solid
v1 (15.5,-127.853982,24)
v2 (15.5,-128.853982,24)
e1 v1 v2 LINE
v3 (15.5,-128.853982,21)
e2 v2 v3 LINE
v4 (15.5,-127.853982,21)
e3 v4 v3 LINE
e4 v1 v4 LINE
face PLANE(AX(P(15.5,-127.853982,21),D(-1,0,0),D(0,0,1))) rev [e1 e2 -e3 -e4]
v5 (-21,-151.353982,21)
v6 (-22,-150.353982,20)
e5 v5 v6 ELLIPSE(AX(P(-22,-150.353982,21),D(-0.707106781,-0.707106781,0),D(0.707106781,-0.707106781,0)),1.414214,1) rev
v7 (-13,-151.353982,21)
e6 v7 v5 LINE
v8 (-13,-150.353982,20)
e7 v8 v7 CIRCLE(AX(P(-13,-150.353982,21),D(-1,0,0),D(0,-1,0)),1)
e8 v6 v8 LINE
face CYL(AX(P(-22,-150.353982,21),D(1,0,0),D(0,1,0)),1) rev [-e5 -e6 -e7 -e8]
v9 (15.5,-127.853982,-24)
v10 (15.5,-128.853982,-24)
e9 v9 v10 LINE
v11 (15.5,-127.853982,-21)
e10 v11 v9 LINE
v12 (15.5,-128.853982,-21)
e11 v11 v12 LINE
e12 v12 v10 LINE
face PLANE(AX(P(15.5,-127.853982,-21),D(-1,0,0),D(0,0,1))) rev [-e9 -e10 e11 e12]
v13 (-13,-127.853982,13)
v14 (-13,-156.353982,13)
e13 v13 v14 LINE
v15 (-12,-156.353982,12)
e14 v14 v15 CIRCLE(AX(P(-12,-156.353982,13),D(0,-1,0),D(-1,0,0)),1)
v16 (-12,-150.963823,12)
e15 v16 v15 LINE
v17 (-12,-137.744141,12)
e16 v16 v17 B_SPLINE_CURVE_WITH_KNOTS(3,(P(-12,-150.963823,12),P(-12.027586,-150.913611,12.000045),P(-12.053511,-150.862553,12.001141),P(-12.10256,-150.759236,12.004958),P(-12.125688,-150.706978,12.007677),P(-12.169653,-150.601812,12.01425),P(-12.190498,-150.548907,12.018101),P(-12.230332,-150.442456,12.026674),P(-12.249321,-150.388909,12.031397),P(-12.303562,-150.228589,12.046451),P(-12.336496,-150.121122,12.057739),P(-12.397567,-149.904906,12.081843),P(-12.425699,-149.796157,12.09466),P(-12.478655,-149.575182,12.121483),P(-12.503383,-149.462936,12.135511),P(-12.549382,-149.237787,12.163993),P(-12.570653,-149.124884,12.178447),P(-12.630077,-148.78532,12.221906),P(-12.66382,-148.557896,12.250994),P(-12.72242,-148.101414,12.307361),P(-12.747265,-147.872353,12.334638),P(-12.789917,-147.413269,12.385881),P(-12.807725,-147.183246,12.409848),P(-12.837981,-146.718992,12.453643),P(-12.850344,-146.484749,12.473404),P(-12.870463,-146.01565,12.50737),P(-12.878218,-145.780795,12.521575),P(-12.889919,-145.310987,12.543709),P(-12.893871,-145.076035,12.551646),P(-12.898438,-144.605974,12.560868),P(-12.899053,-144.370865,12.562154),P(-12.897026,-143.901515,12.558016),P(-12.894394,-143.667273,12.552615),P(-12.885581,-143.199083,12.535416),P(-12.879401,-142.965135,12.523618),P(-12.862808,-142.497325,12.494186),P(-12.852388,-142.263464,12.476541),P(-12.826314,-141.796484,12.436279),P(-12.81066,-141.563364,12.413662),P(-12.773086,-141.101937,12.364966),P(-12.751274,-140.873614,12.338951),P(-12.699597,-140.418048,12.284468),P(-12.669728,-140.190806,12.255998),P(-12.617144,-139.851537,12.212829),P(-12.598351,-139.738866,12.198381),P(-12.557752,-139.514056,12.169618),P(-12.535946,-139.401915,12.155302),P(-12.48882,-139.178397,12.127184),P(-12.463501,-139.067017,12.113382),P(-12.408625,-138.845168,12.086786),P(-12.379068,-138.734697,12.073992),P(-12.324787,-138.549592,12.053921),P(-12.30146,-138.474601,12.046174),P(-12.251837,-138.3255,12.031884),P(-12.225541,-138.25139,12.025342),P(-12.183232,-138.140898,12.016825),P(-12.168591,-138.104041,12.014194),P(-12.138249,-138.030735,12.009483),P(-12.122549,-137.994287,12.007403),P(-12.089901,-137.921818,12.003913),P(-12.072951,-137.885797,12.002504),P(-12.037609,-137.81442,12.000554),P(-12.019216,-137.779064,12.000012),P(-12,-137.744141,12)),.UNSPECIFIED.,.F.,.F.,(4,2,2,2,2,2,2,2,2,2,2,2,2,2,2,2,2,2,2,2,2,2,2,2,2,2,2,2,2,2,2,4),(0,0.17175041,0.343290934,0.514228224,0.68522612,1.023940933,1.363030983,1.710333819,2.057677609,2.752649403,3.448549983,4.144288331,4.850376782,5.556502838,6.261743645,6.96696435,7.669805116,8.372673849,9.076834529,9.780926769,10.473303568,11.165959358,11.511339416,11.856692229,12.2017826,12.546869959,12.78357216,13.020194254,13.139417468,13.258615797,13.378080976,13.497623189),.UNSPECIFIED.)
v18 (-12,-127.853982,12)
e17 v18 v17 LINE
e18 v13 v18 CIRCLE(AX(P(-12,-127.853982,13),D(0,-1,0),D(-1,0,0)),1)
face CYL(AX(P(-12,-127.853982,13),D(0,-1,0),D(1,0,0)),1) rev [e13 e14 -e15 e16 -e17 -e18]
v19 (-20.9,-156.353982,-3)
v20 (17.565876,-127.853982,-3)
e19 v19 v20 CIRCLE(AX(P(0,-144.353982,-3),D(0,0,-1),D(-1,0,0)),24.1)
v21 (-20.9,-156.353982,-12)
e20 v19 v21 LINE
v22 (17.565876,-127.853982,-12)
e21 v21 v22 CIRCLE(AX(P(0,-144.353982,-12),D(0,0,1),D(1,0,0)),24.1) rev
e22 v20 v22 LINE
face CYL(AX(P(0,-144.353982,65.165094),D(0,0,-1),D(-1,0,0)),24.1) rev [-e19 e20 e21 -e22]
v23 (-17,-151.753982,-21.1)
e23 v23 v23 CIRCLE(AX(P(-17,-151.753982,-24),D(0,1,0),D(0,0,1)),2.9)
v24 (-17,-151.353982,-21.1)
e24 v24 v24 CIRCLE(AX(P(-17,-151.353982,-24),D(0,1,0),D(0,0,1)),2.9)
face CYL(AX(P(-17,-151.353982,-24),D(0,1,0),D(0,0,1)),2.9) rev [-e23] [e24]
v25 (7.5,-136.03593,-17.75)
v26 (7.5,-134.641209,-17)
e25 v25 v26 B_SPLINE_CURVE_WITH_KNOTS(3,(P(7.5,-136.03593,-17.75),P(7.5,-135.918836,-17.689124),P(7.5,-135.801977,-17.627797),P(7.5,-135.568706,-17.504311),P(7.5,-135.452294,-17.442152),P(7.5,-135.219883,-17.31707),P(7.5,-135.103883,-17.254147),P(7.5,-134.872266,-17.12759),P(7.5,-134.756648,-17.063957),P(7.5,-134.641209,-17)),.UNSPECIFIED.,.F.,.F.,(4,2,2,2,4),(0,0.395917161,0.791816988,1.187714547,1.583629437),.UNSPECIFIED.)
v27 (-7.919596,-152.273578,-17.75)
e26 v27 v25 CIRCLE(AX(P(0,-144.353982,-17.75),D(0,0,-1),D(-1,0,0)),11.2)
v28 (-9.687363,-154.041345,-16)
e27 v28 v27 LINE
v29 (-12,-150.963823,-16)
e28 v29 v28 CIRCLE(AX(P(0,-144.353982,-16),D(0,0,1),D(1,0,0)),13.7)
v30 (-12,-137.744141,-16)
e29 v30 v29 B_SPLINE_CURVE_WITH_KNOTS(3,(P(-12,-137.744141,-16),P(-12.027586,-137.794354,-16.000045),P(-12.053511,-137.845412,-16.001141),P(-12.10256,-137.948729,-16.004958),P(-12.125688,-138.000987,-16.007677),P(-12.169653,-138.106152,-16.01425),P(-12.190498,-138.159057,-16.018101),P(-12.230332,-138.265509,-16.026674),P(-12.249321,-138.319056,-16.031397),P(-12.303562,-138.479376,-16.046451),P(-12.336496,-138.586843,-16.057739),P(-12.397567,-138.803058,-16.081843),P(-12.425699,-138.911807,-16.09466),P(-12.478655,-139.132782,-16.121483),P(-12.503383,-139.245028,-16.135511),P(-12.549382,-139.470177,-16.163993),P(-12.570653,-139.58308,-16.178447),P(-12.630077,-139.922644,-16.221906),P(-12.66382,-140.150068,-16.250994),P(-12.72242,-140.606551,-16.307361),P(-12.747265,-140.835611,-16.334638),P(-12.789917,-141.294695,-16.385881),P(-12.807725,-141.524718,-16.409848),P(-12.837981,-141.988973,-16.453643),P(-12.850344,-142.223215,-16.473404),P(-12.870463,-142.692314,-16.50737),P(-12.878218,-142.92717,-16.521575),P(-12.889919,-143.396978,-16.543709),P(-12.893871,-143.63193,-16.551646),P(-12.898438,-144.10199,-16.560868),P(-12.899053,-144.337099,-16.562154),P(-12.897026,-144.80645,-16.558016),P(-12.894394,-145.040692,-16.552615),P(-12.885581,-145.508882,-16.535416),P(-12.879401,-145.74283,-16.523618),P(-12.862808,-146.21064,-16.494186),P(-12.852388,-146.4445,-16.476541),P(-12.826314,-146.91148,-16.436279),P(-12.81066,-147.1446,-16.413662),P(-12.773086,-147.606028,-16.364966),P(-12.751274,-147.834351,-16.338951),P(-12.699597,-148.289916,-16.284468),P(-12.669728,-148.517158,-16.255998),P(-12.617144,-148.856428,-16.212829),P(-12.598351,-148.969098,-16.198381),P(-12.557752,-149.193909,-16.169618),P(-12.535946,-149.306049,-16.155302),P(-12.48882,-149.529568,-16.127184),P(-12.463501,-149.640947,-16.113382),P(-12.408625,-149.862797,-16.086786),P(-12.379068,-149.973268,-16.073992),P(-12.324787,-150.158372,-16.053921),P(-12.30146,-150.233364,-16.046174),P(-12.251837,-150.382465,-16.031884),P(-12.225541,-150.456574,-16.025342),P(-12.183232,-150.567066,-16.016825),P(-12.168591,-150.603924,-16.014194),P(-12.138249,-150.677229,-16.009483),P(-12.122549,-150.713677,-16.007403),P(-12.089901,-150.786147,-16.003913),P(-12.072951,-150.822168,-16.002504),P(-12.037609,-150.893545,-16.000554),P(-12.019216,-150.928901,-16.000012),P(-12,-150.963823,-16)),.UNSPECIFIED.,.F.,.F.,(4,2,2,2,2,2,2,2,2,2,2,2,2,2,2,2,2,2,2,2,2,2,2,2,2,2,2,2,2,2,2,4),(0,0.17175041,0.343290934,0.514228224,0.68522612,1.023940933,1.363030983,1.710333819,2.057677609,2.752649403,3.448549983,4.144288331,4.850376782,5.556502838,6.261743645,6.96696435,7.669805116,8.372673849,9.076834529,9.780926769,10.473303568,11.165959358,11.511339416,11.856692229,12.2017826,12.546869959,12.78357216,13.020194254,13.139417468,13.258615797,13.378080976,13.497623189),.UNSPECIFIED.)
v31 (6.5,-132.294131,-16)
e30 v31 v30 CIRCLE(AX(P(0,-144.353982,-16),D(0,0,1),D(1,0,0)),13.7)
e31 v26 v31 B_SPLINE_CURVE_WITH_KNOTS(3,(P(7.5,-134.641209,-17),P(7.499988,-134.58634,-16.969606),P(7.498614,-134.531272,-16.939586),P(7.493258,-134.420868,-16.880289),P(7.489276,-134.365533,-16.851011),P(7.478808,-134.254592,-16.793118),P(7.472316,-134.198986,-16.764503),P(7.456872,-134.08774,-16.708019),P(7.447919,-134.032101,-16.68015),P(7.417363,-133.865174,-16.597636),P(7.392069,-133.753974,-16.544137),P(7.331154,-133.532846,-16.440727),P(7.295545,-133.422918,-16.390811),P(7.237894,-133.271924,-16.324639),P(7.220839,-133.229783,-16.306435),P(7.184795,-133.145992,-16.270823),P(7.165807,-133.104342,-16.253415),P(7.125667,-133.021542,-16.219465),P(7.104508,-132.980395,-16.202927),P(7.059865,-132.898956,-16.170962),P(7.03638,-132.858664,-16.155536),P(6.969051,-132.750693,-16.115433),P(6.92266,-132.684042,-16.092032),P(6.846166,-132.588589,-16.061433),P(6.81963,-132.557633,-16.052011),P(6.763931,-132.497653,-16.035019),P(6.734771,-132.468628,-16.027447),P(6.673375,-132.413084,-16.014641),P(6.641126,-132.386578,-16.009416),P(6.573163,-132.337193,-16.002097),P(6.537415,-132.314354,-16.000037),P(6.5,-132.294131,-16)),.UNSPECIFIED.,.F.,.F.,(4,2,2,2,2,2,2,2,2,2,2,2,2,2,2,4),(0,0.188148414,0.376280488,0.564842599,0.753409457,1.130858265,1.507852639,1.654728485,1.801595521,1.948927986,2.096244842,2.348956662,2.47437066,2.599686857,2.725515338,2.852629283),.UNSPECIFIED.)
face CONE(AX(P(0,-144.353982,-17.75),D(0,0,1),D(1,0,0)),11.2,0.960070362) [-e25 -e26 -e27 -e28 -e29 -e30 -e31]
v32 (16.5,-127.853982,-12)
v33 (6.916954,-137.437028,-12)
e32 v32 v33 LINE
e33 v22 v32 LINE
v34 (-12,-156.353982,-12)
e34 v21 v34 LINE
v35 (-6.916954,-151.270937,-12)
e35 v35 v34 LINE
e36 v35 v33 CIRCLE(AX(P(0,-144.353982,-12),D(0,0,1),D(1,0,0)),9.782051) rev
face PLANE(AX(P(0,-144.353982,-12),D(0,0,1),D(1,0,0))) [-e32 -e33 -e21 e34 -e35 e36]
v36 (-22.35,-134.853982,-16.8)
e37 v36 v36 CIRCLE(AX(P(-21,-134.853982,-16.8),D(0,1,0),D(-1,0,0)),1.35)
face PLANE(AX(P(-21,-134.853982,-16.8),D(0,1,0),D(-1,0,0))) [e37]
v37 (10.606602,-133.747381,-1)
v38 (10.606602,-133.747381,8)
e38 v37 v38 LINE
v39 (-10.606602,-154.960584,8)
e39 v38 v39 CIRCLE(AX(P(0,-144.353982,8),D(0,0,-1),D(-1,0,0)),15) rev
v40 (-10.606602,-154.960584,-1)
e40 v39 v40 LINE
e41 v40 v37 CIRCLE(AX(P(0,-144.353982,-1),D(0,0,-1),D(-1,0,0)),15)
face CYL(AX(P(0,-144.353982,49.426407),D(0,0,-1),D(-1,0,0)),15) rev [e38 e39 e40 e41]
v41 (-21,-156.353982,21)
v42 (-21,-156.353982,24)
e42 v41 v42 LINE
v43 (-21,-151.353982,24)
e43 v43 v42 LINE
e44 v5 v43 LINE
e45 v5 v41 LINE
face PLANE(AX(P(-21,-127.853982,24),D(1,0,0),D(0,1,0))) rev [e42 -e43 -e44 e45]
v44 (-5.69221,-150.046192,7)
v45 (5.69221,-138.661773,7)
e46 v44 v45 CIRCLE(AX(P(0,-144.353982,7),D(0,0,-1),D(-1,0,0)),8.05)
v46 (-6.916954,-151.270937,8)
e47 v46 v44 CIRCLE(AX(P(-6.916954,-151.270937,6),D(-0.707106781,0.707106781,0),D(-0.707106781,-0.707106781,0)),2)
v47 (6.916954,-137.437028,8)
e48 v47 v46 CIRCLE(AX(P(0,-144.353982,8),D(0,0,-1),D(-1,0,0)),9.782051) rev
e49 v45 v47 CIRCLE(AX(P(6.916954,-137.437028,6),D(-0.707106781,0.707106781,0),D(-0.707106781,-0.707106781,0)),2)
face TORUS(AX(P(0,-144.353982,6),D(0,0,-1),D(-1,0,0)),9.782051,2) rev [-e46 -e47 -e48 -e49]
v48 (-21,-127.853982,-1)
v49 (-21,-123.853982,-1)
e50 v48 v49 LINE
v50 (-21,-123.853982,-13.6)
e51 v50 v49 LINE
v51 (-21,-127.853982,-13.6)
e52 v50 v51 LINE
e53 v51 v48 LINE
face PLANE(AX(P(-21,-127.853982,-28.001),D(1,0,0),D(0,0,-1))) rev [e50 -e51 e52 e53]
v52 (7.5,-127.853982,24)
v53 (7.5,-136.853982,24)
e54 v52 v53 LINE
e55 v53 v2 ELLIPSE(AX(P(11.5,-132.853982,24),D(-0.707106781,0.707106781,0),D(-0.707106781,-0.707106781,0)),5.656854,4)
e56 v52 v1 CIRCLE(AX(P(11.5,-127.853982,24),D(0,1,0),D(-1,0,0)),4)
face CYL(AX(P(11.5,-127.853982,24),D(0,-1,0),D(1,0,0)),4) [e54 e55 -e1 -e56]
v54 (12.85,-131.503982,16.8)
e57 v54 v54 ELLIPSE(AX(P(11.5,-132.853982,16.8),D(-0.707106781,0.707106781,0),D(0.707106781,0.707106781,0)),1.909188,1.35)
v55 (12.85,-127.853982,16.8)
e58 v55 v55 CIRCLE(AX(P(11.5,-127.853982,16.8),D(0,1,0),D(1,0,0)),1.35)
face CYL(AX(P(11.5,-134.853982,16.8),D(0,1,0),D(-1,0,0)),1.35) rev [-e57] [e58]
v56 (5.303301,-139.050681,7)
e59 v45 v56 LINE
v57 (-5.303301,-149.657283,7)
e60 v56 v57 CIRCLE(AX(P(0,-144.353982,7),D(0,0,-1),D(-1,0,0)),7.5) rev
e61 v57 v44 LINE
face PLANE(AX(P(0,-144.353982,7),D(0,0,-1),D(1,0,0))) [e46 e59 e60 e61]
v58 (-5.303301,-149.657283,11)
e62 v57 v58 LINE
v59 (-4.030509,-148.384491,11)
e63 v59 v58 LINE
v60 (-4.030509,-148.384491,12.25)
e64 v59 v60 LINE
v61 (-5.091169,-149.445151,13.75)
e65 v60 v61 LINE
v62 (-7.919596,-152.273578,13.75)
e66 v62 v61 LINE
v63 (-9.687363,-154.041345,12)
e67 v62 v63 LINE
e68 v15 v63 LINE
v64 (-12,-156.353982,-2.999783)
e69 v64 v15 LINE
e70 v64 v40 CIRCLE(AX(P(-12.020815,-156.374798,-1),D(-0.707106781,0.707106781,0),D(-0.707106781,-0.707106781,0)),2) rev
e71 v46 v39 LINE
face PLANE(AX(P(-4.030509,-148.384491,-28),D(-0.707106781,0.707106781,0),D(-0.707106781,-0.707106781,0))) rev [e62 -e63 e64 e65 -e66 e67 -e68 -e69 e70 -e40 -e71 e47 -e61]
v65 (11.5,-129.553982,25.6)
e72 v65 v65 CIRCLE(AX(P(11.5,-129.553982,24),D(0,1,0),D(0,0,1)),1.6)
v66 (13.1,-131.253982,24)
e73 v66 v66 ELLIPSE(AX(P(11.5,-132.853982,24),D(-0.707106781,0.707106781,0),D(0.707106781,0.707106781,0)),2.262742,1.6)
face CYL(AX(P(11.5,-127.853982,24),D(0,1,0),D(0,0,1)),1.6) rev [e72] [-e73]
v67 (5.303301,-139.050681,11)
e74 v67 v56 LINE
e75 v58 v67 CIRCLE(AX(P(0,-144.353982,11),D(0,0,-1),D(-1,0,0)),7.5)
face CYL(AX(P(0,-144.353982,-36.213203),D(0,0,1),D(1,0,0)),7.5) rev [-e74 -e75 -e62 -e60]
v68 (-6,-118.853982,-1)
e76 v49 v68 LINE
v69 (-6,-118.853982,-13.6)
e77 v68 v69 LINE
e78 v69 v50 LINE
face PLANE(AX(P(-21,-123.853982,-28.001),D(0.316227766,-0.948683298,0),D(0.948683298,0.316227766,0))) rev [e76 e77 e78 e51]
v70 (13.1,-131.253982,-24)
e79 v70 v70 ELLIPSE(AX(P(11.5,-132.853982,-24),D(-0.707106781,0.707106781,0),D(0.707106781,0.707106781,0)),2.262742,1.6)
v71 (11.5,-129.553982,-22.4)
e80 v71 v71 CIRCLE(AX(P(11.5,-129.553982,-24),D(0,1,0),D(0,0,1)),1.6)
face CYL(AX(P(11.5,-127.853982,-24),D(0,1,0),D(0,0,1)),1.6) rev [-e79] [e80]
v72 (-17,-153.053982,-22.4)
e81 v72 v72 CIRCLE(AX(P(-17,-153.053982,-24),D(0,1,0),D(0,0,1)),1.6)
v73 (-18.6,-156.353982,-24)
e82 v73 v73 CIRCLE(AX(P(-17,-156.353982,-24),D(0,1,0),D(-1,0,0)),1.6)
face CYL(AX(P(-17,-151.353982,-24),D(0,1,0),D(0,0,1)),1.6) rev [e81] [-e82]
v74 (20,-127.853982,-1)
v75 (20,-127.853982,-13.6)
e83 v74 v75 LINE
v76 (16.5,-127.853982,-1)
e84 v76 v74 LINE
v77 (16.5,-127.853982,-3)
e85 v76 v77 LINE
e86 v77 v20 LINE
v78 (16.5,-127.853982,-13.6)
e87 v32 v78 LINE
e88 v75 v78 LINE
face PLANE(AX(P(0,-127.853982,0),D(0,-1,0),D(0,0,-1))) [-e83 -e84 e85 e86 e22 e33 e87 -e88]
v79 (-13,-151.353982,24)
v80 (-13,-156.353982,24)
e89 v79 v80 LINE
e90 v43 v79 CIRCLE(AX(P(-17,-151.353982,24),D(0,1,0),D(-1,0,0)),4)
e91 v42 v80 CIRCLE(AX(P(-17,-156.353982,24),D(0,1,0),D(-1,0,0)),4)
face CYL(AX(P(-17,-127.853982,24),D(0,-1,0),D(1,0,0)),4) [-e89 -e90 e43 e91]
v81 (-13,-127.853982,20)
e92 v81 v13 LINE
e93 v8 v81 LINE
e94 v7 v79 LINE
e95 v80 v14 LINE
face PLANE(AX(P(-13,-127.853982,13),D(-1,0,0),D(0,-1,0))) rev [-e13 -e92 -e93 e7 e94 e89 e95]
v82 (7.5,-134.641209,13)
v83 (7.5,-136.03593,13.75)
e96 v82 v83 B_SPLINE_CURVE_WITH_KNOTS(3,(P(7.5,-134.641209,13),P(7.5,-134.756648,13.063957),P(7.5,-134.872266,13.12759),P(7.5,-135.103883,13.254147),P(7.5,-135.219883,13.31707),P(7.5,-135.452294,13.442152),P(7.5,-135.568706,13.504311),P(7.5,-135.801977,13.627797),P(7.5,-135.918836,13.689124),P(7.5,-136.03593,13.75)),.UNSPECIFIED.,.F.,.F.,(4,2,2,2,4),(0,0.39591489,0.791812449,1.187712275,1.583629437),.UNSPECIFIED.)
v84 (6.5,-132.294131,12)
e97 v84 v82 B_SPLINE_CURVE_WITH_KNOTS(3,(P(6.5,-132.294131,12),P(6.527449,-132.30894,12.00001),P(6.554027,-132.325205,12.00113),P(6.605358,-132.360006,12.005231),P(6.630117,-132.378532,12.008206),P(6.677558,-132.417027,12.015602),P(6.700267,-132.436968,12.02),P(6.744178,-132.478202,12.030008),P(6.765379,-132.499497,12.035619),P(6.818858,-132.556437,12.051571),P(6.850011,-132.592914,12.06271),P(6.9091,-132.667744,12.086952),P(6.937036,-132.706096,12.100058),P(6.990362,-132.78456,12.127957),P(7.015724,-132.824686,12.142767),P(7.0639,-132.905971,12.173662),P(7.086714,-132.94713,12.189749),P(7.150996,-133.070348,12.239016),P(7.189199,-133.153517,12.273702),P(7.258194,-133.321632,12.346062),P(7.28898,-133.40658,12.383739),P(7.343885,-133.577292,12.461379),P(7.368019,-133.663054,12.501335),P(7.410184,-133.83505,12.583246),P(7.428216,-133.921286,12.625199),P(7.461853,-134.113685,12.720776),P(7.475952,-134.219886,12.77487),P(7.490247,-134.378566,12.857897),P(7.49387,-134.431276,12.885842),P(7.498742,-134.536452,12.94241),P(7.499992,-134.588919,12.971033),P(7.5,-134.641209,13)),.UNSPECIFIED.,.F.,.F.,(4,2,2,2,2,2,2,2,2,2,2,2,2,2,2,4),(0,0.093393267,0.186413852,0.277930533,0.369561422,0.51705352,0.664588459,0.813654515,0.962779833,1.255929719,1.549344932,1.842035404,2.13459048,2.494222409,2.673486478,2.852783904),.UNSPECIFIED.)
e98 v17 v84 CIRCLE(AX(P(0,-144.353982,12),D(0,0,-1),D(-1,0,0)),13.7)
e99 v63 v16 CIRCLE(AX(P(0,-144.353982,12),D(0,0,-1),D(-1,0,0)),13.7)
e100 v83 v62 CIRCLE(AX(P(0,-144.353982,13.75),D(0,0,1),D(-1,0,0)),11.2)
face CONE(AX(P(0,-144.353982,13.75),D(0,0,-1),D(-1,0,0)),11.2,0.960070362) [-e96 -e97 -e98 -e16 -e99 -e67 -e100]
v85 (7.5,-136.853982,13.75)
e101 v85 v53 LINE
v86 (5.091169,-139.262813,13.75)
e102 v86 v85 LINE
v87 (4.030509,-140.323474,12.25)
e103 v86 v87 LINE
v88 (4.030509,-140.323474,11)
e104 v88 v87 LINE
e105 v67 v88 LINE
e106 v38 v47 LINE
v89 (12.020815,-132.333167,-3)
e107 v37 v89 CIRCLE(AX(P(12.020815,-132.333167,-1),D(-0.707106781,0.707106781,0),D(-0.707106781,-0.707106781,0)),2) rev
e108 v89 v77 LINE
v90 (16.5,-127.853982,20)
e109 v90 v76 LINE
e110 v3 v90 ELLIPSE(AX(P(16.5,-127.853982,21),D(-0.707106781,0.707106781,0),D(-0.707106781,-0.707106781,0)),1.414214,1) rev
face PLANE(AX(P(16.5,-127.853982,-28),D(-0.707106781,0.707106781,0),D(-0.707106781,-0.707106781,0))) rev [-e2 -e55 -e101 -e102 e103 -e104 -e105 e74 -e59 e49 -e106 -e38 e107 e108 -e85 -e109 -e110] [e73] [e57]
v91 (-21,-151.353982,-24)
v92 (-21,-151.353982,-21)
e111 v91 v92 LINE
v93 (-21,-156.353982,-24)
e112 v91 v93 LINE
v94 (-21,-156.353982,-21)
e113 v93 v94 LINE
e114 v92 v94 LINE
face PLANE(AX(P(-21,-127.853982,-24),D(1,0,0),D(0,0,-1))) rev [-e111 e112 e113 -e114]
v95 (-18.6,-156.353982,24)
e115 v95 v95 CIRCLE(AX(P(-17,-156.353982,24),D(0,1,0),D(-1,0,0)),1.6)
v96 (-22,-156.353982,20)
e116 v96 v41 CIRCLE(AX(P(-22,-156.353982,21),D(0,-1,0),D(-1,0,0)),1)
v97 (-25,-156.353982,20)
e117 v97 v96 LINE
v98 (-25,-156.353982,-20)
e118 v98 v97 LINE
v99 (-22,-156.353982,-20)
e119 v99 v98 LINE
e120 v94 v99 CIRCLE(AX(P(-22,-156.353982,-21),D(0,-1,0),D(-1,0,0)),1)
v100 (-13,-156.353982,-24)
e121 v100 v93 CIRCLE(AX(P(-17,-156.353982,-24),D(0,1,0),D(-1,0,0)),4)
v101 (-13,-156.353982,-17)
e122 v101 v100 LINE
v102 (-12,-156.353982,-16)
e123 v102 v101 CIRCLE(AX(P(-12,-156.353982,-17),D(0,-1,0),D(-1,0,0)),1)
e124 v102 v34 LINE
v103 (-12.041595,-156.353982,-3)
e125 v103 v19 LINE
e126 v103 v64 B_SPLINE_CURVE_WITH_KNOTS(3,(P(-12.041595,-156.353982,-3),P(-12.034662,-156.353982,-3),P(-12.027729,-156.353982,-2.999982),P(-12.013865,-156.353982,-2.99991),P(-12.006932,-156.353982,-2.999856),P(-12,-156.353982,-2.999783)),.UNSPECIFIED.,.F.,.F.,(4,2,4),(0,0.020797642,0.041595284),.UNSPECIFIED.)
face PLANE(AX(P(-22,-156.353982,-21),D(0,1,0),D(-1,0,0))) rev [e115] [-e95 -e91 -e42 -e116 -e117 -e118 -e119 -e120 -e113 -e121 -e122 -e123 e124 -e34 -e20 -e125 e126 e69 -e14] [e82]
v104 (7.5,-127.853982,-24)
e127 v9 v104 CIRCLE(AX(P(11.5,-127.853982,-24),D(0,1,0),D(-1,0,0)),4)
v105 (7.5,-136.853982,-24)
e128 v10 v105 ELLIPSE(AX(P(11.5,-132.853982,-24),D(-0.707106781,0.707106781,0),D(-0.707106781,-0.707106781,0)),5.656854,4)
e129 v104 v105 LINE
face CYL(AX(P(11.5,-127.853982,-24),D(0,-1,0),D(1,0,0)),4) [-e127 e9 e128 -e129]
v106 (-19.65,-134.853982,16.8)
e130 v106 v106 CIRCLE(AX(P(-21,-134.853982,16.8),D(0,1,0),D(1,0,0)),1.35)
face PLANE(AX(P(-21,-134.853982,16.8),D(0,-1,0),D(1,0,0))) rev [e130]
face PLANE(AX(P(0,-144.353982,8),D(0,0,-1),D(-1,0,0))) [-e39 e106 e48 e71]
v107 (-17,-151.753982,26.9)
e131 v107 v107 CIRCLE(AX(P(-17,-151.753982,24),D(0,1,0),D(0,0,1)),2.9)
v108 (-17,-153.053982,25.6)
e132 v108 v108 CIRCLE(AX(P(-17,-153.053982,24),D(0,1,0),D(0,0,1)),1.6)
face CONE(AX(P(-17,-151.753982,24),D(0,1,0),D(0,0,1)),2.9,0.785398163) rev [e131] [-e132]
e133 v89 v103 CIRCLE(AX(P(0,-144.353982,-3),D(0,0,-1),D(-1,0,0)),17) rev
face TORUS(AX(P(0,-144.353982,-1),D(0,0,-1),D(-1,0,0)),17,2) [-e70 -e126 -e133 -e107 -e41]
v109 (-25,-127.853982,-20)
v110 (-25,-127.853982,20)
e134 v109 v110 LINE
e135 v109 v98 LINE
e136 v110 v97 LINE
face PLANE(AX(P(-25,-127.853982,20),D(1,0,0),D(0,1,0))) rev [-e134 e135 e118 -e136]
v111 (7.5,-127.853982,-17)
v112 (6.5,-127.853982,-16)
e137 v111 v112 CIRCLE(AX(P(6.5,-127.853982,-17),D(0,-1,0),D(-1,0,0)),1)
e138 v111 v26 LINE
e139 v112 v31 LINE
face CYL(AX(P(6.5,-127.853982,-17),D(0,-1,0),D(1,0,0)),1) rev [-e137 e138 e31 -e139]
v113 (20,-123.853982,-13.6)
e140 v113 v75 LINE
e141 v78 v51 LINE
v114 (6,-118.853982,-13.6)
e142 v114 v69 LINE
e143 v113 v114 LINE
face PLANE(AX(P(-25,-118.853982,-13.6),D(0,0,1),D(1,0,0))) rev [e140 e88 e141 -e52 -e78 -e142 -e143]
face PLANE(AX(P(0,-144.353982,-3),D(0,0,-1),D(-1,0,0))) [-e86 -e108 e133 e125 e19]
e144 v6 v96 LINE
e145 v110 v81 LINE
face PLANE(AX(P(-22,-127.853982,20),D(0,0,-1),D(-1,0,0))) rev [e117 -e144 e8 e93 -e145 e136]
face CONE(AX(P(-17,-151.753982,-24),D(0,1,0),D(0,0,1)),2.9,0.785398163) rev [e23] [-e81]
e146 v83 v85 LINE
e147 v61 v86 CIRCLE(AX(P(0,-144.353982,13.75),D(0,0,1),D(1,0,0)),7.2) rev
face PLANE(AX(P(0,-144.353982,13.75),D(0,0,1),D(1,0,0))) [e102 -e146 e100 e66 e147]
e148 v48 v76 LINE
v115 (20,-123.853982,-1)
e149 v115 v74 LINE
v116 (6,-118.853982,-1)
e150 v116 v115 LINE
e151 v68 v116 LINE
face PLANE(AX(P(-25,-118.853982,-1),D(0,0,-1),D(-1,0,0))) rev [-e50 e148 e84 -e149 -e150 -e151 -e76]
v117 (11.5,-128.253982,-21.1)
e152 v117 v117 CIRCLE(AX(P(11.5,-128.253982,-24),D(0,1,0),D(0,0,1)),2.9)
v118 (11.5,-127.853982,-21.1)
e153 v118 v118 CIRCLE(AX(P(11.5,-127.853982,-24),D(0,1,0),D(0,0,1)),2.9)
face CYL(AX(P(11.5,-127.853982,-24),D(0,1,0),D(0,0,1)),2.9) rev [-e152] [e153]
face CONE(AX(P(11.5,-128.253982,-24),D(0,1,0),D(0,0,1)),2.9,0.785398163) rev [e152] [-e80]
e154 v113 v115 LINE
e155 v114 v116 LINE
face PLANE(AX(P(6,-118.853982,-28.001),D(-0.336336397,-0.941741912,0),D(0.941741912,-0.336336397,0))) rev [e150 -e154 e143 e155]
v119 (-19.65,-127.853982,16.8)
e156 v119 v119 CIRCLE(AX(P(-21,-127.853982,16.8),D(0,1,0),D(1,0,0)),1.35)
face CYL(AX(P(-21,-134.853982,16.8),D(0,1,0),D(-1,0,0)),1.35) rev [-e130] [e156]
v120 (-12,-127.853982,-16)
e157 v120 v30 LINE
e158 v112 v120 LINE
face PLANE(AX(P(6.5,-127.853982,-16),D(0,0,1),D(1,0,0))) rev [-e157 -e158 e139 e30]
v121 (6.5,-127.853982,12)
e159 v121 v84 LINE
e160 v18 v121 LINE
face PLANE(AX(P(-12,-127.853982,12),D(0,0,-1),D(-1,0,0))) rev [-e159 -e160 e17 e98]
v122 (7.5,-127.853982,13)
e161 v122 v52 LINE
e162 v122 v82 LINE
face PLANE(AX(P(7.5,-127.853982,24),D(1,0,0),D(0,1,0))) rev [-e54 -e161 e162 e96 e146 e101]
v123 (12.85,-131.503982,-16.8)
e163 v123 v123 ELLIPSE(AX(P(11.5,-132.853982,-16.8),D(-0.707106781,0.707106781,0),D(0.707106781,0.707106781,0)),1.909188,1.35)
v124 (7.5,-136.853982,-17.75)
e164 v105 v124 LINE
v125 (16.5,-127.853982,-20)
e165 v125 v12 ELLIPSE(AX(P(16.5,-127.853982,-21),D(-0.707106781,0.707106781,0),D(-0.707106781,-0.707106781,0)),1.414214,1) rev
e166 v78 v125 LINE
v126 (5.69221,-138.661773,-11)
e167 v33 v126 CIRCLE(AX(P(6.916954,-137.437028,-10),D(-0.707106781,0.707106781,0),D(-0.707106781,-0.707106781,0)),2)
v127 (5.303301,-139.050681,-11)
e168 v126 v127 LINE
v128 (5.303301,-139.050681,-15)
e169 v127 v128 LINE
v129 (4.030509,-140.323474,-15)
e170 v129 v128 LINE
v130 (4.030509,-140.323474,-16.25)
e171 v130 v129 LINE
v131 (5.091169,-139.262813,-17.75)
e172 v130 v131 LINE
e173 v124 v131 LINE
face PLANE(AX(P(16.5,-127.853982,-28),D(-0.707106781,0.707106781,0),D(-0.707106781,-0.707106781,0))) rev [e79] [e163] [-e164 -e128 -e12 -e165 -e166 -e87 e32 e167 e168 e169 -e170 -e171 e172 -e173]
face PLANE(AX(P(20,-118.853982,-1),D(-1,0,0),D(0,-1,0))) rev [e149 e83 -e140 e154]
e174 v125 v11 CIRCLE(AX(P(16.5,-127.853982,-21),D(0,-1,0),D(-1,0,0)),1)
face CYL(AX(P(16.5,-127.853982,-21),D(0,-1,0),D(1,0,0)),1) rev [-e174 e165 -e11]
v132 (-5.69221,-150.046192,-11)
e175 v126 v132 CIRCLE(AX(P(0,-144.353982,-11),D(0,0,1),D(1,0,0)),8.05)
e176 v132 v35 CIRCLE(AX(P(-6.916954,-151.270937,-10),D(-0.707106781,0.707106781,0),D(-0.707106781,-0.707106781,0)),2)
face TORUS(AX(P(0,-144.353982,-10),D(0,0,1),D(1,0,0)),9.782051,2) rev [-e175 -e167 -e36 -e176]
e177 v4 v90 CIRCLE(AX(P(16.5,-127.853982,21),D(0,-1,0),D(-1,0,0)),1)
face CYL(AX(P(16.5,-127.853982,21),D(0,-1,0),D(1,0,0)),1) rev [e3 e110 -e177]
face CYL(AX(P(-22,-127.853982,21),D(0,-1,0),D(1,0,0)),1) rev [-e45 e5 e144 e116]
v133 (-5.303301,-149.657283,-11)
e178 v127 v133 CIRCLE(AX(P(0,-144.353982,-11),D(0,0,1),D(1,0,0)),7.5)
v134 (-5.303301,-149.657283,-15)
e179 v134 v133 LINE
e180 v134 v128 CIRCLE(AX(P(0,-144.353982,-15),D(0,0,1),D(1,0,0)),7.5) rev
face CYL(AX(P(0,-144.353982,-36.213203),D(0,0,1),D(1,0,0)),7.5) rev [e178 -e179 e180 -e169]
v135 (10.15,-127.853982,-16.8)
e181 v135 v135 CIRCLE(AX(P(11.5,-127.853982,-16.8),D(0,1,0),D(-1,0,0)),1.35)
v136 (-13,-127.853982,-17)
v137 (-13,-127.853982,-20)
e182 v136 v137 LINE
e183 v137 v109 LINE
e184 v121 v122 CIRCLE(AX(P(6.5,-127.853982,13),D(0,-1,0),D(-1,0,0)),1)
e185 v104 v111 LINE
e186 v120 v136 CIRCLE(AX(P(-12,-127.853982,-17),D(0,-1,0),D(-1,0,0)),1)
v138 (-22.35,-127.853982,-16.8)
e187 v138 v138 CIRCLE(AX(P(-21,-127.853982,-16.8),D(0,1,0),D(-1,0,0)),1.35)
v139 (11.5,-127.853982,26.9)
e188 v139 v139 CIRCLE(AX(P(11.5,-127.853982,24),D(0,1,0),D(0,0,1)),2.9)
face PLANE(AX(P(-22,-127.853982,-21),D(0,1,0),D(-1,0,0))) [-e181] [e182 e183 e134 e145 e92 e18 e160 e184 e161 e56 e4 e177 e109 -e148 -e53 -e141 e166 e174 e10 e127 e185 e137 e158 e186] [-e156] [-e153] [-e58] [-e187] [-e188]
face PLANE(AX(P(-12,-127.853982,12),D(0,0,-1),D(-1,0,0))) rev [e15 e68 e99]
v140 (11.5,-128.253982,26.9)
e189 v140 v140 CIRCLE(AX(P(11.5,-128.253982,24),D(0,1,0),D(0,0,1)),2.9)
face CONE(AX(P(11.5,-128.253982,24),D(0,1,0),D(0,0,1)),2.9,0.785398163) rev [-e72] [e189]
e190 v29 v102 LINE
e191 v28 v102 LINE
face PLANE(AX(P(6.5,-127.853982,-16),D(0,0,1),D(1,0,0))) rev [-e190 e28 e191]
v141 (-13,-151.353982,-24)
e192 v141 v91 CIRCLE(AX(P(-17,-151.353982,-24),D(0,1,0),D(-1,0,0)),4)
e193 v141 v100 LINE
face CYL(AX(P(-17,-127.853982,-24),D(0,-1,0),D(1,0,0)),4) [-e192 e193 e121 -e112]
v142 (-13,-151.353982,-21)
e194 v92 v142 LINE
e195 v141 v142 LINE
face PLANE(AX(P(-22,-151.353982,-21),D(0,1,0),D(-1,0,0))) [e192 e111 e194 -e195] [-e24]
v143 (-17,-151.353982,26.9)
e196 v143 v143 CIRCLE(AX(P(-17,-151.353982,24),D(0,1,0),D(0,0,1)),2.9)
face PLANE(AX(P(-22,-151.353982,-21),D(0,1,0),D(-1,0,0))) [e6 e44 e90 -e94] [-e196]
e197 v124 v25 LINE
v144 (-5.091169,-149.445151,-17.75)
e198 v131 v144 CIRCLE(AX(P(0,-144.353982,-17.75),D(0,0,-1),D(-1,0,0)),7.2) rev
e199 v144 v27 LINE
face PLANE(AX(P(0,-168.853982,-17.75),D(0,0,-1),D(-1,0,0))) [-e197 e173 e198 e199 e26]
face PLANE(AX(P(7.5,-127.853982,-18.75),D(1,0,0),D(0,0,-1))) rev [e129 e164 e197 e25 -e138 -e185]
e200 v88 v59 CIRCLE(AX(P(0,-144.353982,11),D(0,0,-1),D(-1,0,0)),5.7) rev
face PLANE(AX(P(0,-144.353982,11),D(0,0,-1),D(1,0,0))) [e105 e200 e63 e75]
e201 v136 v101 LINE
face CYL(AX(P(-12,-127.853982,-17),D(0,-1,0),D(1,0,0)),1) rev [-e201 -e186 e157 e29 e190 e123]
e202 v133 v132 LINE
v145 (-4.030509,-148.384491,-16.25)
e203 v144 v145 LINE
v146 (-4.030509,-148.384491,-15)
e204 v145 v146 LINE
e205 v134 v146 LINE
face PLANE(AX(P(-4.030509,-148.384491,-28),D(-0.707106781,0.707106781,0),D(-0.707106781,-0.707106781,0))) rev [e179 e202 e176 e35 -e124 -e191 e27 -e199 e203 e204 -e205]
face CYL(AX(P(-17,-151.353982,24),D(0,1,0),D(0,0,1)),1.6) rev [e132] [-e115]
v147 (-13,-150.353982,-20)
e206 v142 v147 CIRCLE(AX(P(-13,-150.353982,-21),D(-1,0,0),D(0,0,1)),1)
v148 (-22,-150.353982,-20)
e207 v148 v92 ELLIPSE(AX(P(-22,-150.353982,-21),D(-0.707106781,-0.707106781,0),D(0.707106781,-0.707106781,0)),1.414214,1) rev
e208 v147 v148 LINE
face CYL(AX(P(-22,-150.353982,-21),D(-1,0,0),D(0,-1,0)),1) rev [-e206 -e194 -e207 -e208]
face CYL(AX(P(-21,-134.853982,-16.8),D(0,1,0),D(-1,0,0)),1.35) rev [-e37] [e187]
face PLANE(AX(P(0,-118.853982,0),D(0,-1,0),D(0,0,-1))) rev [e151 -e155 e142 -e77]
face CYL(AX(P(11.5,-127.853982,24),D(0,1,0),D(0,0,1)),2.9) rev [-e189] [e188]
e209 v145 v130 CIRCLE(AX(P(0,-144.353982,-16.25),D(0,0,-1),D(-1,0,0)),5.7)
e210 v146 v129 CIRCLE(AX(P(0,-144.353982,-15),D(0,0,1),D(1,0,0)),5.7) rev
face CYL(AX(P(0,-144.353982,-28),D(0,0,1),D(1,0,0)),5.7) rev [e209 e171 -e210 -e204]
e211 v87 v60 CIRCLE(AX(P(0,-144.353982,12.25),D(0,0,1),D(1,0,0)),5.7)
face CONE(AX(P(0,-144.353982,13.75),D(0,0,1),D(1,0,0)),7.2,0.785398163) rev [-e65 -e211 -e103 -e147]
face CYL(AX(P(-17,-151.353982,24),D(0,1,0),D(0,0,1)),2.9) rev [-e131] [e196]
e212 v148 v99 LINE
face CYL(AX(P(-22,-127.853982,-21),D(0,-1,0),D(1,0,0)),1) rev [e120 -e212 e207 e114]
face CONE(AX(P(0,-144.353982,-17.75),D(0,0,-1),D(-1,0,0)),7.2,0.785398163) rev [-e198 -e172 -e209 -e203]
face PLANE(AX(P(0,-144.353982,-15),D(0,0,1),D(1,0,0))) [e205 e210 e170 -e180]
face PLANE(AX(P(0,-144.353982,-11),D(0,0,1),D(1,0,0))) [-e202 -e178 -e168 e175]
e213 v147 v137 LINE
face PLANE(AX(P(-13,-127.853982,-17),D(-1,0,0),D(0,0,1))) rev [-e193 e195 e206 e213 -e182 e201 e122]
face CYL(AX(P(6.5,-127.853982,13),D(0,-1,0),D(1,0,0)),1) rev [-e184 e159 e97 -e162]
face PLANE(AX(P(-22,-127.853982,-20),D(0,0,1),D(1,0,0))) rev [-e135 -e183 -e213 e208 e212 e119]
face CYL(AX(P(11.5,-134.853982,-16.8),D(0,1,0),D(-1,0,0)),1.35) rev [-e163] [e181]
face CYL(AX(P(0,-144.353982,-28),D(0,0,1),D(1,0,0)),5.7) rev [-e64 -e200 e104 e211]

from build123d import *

# Parameters (mm, degrees)
BOSS_EXTRU_1_DEPTH                       = 28.5
ESQUISSE5_W                              = 45
ESQUISSE5_H                              = 12.6
BOSS_EXTRU_2_DEPTH                       = 9
ESQUISSE3_R                              = 24.1
ENL_V_MAT_EXTRU_3_DEPTH                  = 8
ENL_V_START                              = -12.6
ENL_V_MAT_EXTRU_5_DEPTH                  = 12.6
ENL_V_START_2                            = -1
ESQUISSE4_R                              = 24.1
ESQUISSE4_R_2                            = 8.05
ENL_V_MAT_EXTRU_4_DEPTH                  = 1
ENL_V_MAT_EXTRU_7_DEPTH                  = 161.796665884
ENL_V_MAT_EXTRU_7_DEPTH_BACK             = 161.796665884
ENL_V_START_3                            = -4
ESQUISSE8_R                              = 7.5
ENL_V_MAT_EXTRU_8_DEPTH                  = 26
ENL_V_START_4                            = 8
ESQUISSE9_R                              = 15
ENL_V_MAT_EXTRU_9_DEPTH                  = 10
ESQUISSE10_R                             = 15
ESQUISSE10_R_2                           = 8.05
ENL_V_MAT_EXTRU_10_DEPTH                 = 1
CONG_1_R                                 = 2
ESQUISSE11_W                             = 12
ESQUISSE11_H                             = 8
ENL_V_MAT_EXTRU_11_DEPTH                 = 23.5
CONG_2_R                                 = 1
FRAISAGE_POUR_VIS_T_TE_FRAIS_E_6_2_COUNT = 2
FRAISAGE_POUR_VIS_T_TE_FRAIS_E_6_2_PITCH = 48
ESQUISSE16_R                             = 1.35
ENL_V_MAT_EXTRU_12_DEPTH                 = 7
BOSS_EXTRU_4_START                       = 1.75
BOSS_EXTRU_4_DEPTH                       = 1.75
BOSS_EXTRU_5_DEPTH                       = 1.75
CHANFREIN2_ANGLE                         = 177.039506
CHANFREIN1_SIZE                          = 1.5


with BuildPart() as part:
    # Esquisse1 → Boss.-Extru.1 (new body)
    with BuildSketch(Plane(origin=(0, -156.353982231, 0), x_dir=(1, 0, 0), z_dir=(0, 1, 0))):
        with BuildLine():
            Line((16.5, -20), (16.5, 20))
            ThreePointArc((16.5, 20), (15.792893219, 20.292893219), (15.5, 21))
            Line((15.5, 21), (15.5, 24))
            ThreePointArc((15.5, 24), (11.5, 28), (7.5, 24))
            Line((7.5, 24), (7.5, 18.75))
            Line((7.5, 18.75), (7.5, 17))
            ThreePointArc((7.5, 17), (7.207106781, 16.292893219), (6.5, 16))
            Line((6.5, 16), (-12, 16))
            ThreePointArc((-12, 16), (-12.707106781, 16.292893219), (-13, 17))
            Line((-13, 17), (-13, 24))
            ThreePointArc((-13, 24), (-17, 28), (-21, 24))
            Line((-21, 24), (-21, 21))
            ThreePointArc((-21, 21), (-21.292893219, 20.292893219), (-22, 20))
            Line((-22, 20), (-25, 20))
            Line((-25, 20), (-25, -20))
            Line((-25, -20), (-22, -20))
            ThreePointArc((-22, -20), (-21.292893219, -20.292893219), (-21, -21))
            Line((-21, -21), (-21, -24))
            ThreePointArc((-21, -24), (-17, -28), (-13, -24))
            Line((-13, -24), (-13, -13))
            ThreePointArc((-13, -13), (-12.707106781, -12.292893219), (-12, -12))
            Line((-12, -12), (6.5, -12))
            ThreePointArc((6.5, -12), (7.207106781, -12.292893219), (7.5, -13))
            Line((7.5, -13), (7.5, -24))
            ThreePointArc((7.5, -24), (11.5, -28), (15.5, -24))
            Line((15.5, -24), (15.5, -21))
            ThreePointArc((15.5, -21), (15.792893219, -20.292893219), (16.5, -20))
        make_face()
    extrude(amount=BOSS_EXTRU_1_DEPTH)

    # Esquisse5 → Boss.-Extru.2 (add)
    with BuildSketch(Plane(origin=(0, -127.853982231, 0), x_dir=(1, 0, 0), z_dir=(0, 1, 0))):
        with Locations((-2.5, 7.3)):
            Rectangle(ESQUISSE5_W, ESQUISSE5_H)
    extrude(amount=BOSS_EXTRU_2_DEPTH)

    # Esquisse3 → Enlèv. mat.-Extru.3 (cut)
    with BuildSketch(Plane(origin=(0, -128.853982231, -11), x_dir=(1, 0, 0), z_dir=(0, 0, 1))):
        with Locations((0, -15.5)):
            Circle(ESQUISSE3_R)
    extrude(amount=ENL_V_MAT_EXTRU_3_DEPTH, mode=Mode.SUBTRACT)

    # Esquisse6 → Enlèv. mat.-Extru.5 (cut)
    with BuildSketch(Plane.XY.offset(-1).offset(ENL_V_START)):
        Polygon((-25, -104.147876216), (-25, -127.853982231), (-21, -127.853982231), (-21, -123.853982231), (-6, -118.853982231), (6, -118.853982231), (20, -123.853982231), (20, -104.147876216), align=None)
    extrude(amount=ENL_V_MAT_EXTRU_5_DEPTH, mode=Mode.SUBTRACT)

    # Esquisse4 → Enlèv. mat.-Extru.4 (cut)
    with BuildSketch(Plane(origin=(0, -168.853982231, -11), x_dir=(1, 0, 0), z_dir=(0, 0, 1)).offset(ENL_V_START_2)):
        with Locations((0, 24.5)):
            Circle(ESQUISSE4_R)
        with Locations((0, 24.5)):
            Circle(ESQUISSE4_R_2, mode=Mode.SUBTRACT)
    extrude(amount=ENL_V_MAT_EXTRU_4_DEPTH, mode=Mode.SUBTRACT)

    # Esquisse7 → Enlèv. mat.-Extru.7 (cut, two sides: drawn at the far end of the back side and taken through both)
    with BuildSketch(Plane.XY.offset(-ENL_V_MAT_EXTRU_7_DEPTH_BACK)):
        with BuildLine():
            Line((-4.030508653, -148.384490884), (-12, -156.353982231))
            Line((-12, -156.353982231), (16.5, -156.353982231))
            Line((16.5, -156.353982231), (16.5, -127.853982231))
            Line((16.5, -127.853982231), (4.030508653, -140.323473578))
            ThreePointArc((4.030508653, -140.323473578), (-4.030508653, -140.323473578), (-4.030508653, -148.384490884))
        make_face()
    extrude(amount=ENL_V_MAT_EXTRU_7_DEPTH + ENL_V_MAT_EXTRU_7_DEPTH_BACK, mode=Mode.SUBTRACT)

    # Esquisse8 → Enlèv. mat.-Extru.8 (cut)
    with BuildSketch(Plane.XY.offset(-11).offset(ENL_V_START_3)):
        with Locations((0, -144.353982231)):
            Circle(ESQUISSE8_R)
    extrude(amount=ENL_V_MAT_EXTRU_8_DEPTH, mode=Mode.SUBTRACT)

    # Esquisse9 → Enlèv. mat.-Extru.9 (cut)
    with BuildSketch(Plane.XY.offset(-11).offset(ENL_V_START_4)):
        with Locations((0, -144.353982231)):
            Circle(ESQUISSE9_R)
    extrude(amount=ENL_V_MAT_EXTRU_9_DEPTH, mode=Mode.SUBTRACT)

    # Esquisse10 → Enlèv. mat.-Extru.10 (cut)
    with BuildSketch(Plane(origin=(0, 0, 7), x_dir=(-1, 0, 0), z_dir=(0, 0, -1)).offset(ENL_V_START_2)):
        with Locations((0, -144.353982231)):
            Circle(ESQUISSE10_R)
        with Locations((0, -144.353982231)):
            Circle(ESQUISSE10_R_2, mode=Mode.SUBTRACT)
    extrude(amount=ENL_V_MAT_EXTRU_10_DEPTH, mode=Mode.SUBTRACT)

    # Congé1
    # the kernel refuses this fillet: 2 mm, written as the material it adds along each edge
    with BuildSketch(Plane(origin=(0, -144.353982231, -12), x_dir=(0.7071067811865527, 0.7071067811865425, 0), z_dir=(0.7071067811865425, -0.7071067811865527, 0))) as cong_1_piece_1:
        with BuildLine():
            CenterArc((9.782050808, 2), CONG_1_R, 210, 60)
            Line((9.782050808, 0), (8.05, 0))
            Line((8.05, 0), (8.05, 1))
        make_face()
    revolve(axis=Axis((0, -144.353982231, -12), (0, 0, 1)), revolution_arc=180)
    with BuildSketch(Plane(origin=(0, -144.353982231, 8), x_dir=(0.7071067811865495, 0.7071067811865456, 0), z_dir=(0.7071067811865456, -0.7071067811865495, 0))) as cong_1_piece_2:
        with BuildLine():
            CenterArc((9.782050808, -2), CONG_1_R, 90, 60)
            Line((8.05, -1), (8.05, 0))
            Line((8.05, 0), (9.782050808, 0))
        make_face()
    revolve(axis=Axis((0, -144.353982231, 8), (0, 0, 1)), revolution_arc=180)
    # the kernel refuses this fillet: 2 mm, written as the material it takes off along each edge
    with BuildSketch(Plane(origin=(0, -144.353982231, -3), x_dir=(0.8997810894111481, 0.43634159913774845, 0), z_dir=(0.43634159913774845, -0.8997810894111481, 0))) as cong_1_2_piece_1:
        with BuildLine():
            CenterArc((15 + CONG_1_R, CONG_1_R), CONG_1_R, 180, 90)
            Line((15 + CONG_1_R, 0), (15, 0))
            Line((15, 0), (15, CONG_1_R))
        make_face()
    revolve(axis=Axis((0, -144.353982231, -3), (0, 0, 1)), revolution_arc=218.25861464, mode=Mode.SUBTRACT)

    # Esquisse11 → Enlèv. mat.-Extru.11 (cut)
    with BuildSketch(Plane(origin=(0, -127.853982231, 0), x_dir=(1, 0, 0), z_dir=(0, 1, 0))):
        with Locations((-19, 24)):
            Rectangle(ESQUISSE11_W, ESQUISSE11_H)
        with Locations((-19, -24)):
            Rectangle(ESQUISSE11_W, ESQUISSE11_H)
    extrude(amount=-ENL_V_MAT_EXTRU_11_DEPTH, mode=Mode.SUBTRACT)

    # Congé2
    cong_2_edges = [part.edges().sort_by_distance(p)[0] for p in [
        (-17.5, -151.353982231, -20),
        (-17.5, -151.353982231, 20),
    ]]
    fillet(cong_2_edges, radius=CONG_2_R)

    # Esquisse12 → Fraisage pour vis _ t_te frais_e _ 6 pan (revolve, cut)
    with BuildSketch(Plane(origin=(-17, -151.353982231, -24), x_dir=(0, 0, 1), z_dir=(1, 0, 0))):
        Polygon((0, 0), (0, 5), (1.6, 5), (1.6, 1.7), (2.9, 0.4), (2.9, 0), align=None)
    fraisage_pour_vis_t_te_frais_e_6_pan = revolve(axis=Axis((-17, -145.003982231, -24), (0, -1, 0)), mode=Mode.SUBTRACT)

    # Fraisage pour vis _ t_te frais_e _ 6 2: Fraisage pour vis _ t_te frais_e _ 6 pan ×2
    with Locations(*[(0, 0, i * FRAISAGE_POUR_VIS_T_TE_FRAIS_E_6_2_PITCH) for i in range(1, FRAISAGE_POUR_VIS_T_TE_FRAIS_E_6_2_COUNT)]):
        add(fraisage_pour_vis_t_te_frais_e_6_pan, mode=Mode.SUBTRACT)

    # Fraisage pour vis _ t_te frais_e _ 6 3: read off the stored shape, not the designer's step
    # Fraisage pour vis _ t_te frais_e _ 6 3 o → Fraisage pour vis _ t_te frais_e _ 6 3 (revolve, cut)
    with BuildSketch(Plane(origin=(11.5, 0, 24), x_dir=(1, 0, 0), z_dir=(0, 0, 1))):
        Polygon((0, -134.475881673), (1.6, -134.475881673), (1.6, -129.553982231), (2.9, -128.253982231), (2.9, -127.853982231), (0, -127.853982231), align=None)
    revolve(axis=Axis((11.5, 0, 24), (0, 1, 0)), mode=Mode.SUBTRACT)

    # Fraisage pour vis _ t_te frais_e _ 6 4 → Fraisage pour vis _ t_te frais_e _ 6 3 2 (revolve, cut)
    with BuildSketch(Plane(origin=(11.5, 0, -24), x_dir=(1, 0, 0), z_dir=(0, 0, 1))):
        Polygon((0, -134.475881673), (1.6, -134.475881673), (1.6, -129.553982231), (2.9, -128.253982231), (2.9, -127.853982231), (0, -127.853982231), align=None)
    revolve(axis=Axis((11.5, 0, -24), (0, 1, 0)), mode=Mode.SUBTRACT)

    # Esquisse16 → Enlèv. mat.-Extru.12 (cut)
    with BuildSketch(Plane(origin=(0, -127.853982231, 0), x_dir=(1, 0, 0), z_dir=(0, 1, 0))):
        with Locations(Location((-21, 16.8, 0), (0, 0, 180))):
            Circle(ESQUISSE16_R)
        with Locations(Location((11.5, 16.8, 0), (0, 0, 180))):
            Circle(ESQUISSE16_R)
        with Locations((11.5, -16.8)):
            Circle(ESQUISSE16_R)
        with Locations((-21, -16.8)):
            Circle(ESQUISSE16_R)
    extrude(amount=-ENL_V_MAT_EXTRU_12_DEPTH, mode=Mode.SUBTRACT)

    # Esquisse17 → Boss.-Extru.4 (add)
    with BuildSketch(Plane(origin=(0, 0, -16), x_dir=(-1, 0, 0), z_dir=(0, 0, -1)).offset(BOSS_EXTRU_4_START)):
        with BuildLine():
            Line((-4.030508653, -140.323473578), (-7.919595949, -136.434386282))
            ThreePointArc((-7.919595949, -136.434386282), (7.919595949, -136.434386282), (7.919595949, -152.27357818))
            Line((7.919595949, -152.27357818), (4.030508653, -148.384490884))
            ThreePointArc((4.030508653, -148.384490884), (4.030508653, -140.323473578), (-4.030508653, -140.323473578))
        make_face()
    extrude(amount=-BOSS_EXTRU_4_DEPTH)

    # Esquisse18 → Boss.-Extru.5 (add)
    with BuildSketch(Plane.XY.offset(12)):
        with BuildLine():
            Line((7.919595949, -136.434386282), (4.030508653, -140.323473578))
            ThreePointArc((4.030508653, -140.323473578), (-4.030508653, -140.323473578), (-4.030508653, -148.384490884))
            Line((-4.030508653, -148.384490884), (-7.919595949, -152.27357818))
            ThreePointArc((-7.919595949, -152.27357818), (-7.919595949, -136.434386282), (7.919595949, -136.434386282))
        make_face()
    extrude(amount=BOSS_EXTRU_5_DEPTH)

    # Chanfrein2: read off the stored shape, not the designer's step
    # Chanfrein2 outline → Chanfrein2 (revolve)
    with BuildSketch(Plane(origin=(0, -144.353982231, 0), x_dir=(0.66964285714286, 0.742683272921605, 0), z_dir=(0.742683272921605, -0.66964285714286, 0))):
        Polygon((13.7, 12), (11.2, 13.75), (11.2, 12), align=None)
        Polygon((11.2, -17.75), (13.7, -16), (11.2, -16), align=None)
    revolve(axis=Axis((0, -144.353982231, 0), (0, 0, 1)), revolution_arc=CHANFREIN2_ANGLE)

    # Chanfrein1
    chanfrein1_edges = [part.edges().sort_by_distance(p)[0] for p in [
        (-4.030508653, -140.323473578, -17.75),
        (-4.030508653, -140.323473578, 13.75),
    ]]
    chamfer(chanfrein1_edges, length=CHANFREIN1_SIZE)


solid = part.part
